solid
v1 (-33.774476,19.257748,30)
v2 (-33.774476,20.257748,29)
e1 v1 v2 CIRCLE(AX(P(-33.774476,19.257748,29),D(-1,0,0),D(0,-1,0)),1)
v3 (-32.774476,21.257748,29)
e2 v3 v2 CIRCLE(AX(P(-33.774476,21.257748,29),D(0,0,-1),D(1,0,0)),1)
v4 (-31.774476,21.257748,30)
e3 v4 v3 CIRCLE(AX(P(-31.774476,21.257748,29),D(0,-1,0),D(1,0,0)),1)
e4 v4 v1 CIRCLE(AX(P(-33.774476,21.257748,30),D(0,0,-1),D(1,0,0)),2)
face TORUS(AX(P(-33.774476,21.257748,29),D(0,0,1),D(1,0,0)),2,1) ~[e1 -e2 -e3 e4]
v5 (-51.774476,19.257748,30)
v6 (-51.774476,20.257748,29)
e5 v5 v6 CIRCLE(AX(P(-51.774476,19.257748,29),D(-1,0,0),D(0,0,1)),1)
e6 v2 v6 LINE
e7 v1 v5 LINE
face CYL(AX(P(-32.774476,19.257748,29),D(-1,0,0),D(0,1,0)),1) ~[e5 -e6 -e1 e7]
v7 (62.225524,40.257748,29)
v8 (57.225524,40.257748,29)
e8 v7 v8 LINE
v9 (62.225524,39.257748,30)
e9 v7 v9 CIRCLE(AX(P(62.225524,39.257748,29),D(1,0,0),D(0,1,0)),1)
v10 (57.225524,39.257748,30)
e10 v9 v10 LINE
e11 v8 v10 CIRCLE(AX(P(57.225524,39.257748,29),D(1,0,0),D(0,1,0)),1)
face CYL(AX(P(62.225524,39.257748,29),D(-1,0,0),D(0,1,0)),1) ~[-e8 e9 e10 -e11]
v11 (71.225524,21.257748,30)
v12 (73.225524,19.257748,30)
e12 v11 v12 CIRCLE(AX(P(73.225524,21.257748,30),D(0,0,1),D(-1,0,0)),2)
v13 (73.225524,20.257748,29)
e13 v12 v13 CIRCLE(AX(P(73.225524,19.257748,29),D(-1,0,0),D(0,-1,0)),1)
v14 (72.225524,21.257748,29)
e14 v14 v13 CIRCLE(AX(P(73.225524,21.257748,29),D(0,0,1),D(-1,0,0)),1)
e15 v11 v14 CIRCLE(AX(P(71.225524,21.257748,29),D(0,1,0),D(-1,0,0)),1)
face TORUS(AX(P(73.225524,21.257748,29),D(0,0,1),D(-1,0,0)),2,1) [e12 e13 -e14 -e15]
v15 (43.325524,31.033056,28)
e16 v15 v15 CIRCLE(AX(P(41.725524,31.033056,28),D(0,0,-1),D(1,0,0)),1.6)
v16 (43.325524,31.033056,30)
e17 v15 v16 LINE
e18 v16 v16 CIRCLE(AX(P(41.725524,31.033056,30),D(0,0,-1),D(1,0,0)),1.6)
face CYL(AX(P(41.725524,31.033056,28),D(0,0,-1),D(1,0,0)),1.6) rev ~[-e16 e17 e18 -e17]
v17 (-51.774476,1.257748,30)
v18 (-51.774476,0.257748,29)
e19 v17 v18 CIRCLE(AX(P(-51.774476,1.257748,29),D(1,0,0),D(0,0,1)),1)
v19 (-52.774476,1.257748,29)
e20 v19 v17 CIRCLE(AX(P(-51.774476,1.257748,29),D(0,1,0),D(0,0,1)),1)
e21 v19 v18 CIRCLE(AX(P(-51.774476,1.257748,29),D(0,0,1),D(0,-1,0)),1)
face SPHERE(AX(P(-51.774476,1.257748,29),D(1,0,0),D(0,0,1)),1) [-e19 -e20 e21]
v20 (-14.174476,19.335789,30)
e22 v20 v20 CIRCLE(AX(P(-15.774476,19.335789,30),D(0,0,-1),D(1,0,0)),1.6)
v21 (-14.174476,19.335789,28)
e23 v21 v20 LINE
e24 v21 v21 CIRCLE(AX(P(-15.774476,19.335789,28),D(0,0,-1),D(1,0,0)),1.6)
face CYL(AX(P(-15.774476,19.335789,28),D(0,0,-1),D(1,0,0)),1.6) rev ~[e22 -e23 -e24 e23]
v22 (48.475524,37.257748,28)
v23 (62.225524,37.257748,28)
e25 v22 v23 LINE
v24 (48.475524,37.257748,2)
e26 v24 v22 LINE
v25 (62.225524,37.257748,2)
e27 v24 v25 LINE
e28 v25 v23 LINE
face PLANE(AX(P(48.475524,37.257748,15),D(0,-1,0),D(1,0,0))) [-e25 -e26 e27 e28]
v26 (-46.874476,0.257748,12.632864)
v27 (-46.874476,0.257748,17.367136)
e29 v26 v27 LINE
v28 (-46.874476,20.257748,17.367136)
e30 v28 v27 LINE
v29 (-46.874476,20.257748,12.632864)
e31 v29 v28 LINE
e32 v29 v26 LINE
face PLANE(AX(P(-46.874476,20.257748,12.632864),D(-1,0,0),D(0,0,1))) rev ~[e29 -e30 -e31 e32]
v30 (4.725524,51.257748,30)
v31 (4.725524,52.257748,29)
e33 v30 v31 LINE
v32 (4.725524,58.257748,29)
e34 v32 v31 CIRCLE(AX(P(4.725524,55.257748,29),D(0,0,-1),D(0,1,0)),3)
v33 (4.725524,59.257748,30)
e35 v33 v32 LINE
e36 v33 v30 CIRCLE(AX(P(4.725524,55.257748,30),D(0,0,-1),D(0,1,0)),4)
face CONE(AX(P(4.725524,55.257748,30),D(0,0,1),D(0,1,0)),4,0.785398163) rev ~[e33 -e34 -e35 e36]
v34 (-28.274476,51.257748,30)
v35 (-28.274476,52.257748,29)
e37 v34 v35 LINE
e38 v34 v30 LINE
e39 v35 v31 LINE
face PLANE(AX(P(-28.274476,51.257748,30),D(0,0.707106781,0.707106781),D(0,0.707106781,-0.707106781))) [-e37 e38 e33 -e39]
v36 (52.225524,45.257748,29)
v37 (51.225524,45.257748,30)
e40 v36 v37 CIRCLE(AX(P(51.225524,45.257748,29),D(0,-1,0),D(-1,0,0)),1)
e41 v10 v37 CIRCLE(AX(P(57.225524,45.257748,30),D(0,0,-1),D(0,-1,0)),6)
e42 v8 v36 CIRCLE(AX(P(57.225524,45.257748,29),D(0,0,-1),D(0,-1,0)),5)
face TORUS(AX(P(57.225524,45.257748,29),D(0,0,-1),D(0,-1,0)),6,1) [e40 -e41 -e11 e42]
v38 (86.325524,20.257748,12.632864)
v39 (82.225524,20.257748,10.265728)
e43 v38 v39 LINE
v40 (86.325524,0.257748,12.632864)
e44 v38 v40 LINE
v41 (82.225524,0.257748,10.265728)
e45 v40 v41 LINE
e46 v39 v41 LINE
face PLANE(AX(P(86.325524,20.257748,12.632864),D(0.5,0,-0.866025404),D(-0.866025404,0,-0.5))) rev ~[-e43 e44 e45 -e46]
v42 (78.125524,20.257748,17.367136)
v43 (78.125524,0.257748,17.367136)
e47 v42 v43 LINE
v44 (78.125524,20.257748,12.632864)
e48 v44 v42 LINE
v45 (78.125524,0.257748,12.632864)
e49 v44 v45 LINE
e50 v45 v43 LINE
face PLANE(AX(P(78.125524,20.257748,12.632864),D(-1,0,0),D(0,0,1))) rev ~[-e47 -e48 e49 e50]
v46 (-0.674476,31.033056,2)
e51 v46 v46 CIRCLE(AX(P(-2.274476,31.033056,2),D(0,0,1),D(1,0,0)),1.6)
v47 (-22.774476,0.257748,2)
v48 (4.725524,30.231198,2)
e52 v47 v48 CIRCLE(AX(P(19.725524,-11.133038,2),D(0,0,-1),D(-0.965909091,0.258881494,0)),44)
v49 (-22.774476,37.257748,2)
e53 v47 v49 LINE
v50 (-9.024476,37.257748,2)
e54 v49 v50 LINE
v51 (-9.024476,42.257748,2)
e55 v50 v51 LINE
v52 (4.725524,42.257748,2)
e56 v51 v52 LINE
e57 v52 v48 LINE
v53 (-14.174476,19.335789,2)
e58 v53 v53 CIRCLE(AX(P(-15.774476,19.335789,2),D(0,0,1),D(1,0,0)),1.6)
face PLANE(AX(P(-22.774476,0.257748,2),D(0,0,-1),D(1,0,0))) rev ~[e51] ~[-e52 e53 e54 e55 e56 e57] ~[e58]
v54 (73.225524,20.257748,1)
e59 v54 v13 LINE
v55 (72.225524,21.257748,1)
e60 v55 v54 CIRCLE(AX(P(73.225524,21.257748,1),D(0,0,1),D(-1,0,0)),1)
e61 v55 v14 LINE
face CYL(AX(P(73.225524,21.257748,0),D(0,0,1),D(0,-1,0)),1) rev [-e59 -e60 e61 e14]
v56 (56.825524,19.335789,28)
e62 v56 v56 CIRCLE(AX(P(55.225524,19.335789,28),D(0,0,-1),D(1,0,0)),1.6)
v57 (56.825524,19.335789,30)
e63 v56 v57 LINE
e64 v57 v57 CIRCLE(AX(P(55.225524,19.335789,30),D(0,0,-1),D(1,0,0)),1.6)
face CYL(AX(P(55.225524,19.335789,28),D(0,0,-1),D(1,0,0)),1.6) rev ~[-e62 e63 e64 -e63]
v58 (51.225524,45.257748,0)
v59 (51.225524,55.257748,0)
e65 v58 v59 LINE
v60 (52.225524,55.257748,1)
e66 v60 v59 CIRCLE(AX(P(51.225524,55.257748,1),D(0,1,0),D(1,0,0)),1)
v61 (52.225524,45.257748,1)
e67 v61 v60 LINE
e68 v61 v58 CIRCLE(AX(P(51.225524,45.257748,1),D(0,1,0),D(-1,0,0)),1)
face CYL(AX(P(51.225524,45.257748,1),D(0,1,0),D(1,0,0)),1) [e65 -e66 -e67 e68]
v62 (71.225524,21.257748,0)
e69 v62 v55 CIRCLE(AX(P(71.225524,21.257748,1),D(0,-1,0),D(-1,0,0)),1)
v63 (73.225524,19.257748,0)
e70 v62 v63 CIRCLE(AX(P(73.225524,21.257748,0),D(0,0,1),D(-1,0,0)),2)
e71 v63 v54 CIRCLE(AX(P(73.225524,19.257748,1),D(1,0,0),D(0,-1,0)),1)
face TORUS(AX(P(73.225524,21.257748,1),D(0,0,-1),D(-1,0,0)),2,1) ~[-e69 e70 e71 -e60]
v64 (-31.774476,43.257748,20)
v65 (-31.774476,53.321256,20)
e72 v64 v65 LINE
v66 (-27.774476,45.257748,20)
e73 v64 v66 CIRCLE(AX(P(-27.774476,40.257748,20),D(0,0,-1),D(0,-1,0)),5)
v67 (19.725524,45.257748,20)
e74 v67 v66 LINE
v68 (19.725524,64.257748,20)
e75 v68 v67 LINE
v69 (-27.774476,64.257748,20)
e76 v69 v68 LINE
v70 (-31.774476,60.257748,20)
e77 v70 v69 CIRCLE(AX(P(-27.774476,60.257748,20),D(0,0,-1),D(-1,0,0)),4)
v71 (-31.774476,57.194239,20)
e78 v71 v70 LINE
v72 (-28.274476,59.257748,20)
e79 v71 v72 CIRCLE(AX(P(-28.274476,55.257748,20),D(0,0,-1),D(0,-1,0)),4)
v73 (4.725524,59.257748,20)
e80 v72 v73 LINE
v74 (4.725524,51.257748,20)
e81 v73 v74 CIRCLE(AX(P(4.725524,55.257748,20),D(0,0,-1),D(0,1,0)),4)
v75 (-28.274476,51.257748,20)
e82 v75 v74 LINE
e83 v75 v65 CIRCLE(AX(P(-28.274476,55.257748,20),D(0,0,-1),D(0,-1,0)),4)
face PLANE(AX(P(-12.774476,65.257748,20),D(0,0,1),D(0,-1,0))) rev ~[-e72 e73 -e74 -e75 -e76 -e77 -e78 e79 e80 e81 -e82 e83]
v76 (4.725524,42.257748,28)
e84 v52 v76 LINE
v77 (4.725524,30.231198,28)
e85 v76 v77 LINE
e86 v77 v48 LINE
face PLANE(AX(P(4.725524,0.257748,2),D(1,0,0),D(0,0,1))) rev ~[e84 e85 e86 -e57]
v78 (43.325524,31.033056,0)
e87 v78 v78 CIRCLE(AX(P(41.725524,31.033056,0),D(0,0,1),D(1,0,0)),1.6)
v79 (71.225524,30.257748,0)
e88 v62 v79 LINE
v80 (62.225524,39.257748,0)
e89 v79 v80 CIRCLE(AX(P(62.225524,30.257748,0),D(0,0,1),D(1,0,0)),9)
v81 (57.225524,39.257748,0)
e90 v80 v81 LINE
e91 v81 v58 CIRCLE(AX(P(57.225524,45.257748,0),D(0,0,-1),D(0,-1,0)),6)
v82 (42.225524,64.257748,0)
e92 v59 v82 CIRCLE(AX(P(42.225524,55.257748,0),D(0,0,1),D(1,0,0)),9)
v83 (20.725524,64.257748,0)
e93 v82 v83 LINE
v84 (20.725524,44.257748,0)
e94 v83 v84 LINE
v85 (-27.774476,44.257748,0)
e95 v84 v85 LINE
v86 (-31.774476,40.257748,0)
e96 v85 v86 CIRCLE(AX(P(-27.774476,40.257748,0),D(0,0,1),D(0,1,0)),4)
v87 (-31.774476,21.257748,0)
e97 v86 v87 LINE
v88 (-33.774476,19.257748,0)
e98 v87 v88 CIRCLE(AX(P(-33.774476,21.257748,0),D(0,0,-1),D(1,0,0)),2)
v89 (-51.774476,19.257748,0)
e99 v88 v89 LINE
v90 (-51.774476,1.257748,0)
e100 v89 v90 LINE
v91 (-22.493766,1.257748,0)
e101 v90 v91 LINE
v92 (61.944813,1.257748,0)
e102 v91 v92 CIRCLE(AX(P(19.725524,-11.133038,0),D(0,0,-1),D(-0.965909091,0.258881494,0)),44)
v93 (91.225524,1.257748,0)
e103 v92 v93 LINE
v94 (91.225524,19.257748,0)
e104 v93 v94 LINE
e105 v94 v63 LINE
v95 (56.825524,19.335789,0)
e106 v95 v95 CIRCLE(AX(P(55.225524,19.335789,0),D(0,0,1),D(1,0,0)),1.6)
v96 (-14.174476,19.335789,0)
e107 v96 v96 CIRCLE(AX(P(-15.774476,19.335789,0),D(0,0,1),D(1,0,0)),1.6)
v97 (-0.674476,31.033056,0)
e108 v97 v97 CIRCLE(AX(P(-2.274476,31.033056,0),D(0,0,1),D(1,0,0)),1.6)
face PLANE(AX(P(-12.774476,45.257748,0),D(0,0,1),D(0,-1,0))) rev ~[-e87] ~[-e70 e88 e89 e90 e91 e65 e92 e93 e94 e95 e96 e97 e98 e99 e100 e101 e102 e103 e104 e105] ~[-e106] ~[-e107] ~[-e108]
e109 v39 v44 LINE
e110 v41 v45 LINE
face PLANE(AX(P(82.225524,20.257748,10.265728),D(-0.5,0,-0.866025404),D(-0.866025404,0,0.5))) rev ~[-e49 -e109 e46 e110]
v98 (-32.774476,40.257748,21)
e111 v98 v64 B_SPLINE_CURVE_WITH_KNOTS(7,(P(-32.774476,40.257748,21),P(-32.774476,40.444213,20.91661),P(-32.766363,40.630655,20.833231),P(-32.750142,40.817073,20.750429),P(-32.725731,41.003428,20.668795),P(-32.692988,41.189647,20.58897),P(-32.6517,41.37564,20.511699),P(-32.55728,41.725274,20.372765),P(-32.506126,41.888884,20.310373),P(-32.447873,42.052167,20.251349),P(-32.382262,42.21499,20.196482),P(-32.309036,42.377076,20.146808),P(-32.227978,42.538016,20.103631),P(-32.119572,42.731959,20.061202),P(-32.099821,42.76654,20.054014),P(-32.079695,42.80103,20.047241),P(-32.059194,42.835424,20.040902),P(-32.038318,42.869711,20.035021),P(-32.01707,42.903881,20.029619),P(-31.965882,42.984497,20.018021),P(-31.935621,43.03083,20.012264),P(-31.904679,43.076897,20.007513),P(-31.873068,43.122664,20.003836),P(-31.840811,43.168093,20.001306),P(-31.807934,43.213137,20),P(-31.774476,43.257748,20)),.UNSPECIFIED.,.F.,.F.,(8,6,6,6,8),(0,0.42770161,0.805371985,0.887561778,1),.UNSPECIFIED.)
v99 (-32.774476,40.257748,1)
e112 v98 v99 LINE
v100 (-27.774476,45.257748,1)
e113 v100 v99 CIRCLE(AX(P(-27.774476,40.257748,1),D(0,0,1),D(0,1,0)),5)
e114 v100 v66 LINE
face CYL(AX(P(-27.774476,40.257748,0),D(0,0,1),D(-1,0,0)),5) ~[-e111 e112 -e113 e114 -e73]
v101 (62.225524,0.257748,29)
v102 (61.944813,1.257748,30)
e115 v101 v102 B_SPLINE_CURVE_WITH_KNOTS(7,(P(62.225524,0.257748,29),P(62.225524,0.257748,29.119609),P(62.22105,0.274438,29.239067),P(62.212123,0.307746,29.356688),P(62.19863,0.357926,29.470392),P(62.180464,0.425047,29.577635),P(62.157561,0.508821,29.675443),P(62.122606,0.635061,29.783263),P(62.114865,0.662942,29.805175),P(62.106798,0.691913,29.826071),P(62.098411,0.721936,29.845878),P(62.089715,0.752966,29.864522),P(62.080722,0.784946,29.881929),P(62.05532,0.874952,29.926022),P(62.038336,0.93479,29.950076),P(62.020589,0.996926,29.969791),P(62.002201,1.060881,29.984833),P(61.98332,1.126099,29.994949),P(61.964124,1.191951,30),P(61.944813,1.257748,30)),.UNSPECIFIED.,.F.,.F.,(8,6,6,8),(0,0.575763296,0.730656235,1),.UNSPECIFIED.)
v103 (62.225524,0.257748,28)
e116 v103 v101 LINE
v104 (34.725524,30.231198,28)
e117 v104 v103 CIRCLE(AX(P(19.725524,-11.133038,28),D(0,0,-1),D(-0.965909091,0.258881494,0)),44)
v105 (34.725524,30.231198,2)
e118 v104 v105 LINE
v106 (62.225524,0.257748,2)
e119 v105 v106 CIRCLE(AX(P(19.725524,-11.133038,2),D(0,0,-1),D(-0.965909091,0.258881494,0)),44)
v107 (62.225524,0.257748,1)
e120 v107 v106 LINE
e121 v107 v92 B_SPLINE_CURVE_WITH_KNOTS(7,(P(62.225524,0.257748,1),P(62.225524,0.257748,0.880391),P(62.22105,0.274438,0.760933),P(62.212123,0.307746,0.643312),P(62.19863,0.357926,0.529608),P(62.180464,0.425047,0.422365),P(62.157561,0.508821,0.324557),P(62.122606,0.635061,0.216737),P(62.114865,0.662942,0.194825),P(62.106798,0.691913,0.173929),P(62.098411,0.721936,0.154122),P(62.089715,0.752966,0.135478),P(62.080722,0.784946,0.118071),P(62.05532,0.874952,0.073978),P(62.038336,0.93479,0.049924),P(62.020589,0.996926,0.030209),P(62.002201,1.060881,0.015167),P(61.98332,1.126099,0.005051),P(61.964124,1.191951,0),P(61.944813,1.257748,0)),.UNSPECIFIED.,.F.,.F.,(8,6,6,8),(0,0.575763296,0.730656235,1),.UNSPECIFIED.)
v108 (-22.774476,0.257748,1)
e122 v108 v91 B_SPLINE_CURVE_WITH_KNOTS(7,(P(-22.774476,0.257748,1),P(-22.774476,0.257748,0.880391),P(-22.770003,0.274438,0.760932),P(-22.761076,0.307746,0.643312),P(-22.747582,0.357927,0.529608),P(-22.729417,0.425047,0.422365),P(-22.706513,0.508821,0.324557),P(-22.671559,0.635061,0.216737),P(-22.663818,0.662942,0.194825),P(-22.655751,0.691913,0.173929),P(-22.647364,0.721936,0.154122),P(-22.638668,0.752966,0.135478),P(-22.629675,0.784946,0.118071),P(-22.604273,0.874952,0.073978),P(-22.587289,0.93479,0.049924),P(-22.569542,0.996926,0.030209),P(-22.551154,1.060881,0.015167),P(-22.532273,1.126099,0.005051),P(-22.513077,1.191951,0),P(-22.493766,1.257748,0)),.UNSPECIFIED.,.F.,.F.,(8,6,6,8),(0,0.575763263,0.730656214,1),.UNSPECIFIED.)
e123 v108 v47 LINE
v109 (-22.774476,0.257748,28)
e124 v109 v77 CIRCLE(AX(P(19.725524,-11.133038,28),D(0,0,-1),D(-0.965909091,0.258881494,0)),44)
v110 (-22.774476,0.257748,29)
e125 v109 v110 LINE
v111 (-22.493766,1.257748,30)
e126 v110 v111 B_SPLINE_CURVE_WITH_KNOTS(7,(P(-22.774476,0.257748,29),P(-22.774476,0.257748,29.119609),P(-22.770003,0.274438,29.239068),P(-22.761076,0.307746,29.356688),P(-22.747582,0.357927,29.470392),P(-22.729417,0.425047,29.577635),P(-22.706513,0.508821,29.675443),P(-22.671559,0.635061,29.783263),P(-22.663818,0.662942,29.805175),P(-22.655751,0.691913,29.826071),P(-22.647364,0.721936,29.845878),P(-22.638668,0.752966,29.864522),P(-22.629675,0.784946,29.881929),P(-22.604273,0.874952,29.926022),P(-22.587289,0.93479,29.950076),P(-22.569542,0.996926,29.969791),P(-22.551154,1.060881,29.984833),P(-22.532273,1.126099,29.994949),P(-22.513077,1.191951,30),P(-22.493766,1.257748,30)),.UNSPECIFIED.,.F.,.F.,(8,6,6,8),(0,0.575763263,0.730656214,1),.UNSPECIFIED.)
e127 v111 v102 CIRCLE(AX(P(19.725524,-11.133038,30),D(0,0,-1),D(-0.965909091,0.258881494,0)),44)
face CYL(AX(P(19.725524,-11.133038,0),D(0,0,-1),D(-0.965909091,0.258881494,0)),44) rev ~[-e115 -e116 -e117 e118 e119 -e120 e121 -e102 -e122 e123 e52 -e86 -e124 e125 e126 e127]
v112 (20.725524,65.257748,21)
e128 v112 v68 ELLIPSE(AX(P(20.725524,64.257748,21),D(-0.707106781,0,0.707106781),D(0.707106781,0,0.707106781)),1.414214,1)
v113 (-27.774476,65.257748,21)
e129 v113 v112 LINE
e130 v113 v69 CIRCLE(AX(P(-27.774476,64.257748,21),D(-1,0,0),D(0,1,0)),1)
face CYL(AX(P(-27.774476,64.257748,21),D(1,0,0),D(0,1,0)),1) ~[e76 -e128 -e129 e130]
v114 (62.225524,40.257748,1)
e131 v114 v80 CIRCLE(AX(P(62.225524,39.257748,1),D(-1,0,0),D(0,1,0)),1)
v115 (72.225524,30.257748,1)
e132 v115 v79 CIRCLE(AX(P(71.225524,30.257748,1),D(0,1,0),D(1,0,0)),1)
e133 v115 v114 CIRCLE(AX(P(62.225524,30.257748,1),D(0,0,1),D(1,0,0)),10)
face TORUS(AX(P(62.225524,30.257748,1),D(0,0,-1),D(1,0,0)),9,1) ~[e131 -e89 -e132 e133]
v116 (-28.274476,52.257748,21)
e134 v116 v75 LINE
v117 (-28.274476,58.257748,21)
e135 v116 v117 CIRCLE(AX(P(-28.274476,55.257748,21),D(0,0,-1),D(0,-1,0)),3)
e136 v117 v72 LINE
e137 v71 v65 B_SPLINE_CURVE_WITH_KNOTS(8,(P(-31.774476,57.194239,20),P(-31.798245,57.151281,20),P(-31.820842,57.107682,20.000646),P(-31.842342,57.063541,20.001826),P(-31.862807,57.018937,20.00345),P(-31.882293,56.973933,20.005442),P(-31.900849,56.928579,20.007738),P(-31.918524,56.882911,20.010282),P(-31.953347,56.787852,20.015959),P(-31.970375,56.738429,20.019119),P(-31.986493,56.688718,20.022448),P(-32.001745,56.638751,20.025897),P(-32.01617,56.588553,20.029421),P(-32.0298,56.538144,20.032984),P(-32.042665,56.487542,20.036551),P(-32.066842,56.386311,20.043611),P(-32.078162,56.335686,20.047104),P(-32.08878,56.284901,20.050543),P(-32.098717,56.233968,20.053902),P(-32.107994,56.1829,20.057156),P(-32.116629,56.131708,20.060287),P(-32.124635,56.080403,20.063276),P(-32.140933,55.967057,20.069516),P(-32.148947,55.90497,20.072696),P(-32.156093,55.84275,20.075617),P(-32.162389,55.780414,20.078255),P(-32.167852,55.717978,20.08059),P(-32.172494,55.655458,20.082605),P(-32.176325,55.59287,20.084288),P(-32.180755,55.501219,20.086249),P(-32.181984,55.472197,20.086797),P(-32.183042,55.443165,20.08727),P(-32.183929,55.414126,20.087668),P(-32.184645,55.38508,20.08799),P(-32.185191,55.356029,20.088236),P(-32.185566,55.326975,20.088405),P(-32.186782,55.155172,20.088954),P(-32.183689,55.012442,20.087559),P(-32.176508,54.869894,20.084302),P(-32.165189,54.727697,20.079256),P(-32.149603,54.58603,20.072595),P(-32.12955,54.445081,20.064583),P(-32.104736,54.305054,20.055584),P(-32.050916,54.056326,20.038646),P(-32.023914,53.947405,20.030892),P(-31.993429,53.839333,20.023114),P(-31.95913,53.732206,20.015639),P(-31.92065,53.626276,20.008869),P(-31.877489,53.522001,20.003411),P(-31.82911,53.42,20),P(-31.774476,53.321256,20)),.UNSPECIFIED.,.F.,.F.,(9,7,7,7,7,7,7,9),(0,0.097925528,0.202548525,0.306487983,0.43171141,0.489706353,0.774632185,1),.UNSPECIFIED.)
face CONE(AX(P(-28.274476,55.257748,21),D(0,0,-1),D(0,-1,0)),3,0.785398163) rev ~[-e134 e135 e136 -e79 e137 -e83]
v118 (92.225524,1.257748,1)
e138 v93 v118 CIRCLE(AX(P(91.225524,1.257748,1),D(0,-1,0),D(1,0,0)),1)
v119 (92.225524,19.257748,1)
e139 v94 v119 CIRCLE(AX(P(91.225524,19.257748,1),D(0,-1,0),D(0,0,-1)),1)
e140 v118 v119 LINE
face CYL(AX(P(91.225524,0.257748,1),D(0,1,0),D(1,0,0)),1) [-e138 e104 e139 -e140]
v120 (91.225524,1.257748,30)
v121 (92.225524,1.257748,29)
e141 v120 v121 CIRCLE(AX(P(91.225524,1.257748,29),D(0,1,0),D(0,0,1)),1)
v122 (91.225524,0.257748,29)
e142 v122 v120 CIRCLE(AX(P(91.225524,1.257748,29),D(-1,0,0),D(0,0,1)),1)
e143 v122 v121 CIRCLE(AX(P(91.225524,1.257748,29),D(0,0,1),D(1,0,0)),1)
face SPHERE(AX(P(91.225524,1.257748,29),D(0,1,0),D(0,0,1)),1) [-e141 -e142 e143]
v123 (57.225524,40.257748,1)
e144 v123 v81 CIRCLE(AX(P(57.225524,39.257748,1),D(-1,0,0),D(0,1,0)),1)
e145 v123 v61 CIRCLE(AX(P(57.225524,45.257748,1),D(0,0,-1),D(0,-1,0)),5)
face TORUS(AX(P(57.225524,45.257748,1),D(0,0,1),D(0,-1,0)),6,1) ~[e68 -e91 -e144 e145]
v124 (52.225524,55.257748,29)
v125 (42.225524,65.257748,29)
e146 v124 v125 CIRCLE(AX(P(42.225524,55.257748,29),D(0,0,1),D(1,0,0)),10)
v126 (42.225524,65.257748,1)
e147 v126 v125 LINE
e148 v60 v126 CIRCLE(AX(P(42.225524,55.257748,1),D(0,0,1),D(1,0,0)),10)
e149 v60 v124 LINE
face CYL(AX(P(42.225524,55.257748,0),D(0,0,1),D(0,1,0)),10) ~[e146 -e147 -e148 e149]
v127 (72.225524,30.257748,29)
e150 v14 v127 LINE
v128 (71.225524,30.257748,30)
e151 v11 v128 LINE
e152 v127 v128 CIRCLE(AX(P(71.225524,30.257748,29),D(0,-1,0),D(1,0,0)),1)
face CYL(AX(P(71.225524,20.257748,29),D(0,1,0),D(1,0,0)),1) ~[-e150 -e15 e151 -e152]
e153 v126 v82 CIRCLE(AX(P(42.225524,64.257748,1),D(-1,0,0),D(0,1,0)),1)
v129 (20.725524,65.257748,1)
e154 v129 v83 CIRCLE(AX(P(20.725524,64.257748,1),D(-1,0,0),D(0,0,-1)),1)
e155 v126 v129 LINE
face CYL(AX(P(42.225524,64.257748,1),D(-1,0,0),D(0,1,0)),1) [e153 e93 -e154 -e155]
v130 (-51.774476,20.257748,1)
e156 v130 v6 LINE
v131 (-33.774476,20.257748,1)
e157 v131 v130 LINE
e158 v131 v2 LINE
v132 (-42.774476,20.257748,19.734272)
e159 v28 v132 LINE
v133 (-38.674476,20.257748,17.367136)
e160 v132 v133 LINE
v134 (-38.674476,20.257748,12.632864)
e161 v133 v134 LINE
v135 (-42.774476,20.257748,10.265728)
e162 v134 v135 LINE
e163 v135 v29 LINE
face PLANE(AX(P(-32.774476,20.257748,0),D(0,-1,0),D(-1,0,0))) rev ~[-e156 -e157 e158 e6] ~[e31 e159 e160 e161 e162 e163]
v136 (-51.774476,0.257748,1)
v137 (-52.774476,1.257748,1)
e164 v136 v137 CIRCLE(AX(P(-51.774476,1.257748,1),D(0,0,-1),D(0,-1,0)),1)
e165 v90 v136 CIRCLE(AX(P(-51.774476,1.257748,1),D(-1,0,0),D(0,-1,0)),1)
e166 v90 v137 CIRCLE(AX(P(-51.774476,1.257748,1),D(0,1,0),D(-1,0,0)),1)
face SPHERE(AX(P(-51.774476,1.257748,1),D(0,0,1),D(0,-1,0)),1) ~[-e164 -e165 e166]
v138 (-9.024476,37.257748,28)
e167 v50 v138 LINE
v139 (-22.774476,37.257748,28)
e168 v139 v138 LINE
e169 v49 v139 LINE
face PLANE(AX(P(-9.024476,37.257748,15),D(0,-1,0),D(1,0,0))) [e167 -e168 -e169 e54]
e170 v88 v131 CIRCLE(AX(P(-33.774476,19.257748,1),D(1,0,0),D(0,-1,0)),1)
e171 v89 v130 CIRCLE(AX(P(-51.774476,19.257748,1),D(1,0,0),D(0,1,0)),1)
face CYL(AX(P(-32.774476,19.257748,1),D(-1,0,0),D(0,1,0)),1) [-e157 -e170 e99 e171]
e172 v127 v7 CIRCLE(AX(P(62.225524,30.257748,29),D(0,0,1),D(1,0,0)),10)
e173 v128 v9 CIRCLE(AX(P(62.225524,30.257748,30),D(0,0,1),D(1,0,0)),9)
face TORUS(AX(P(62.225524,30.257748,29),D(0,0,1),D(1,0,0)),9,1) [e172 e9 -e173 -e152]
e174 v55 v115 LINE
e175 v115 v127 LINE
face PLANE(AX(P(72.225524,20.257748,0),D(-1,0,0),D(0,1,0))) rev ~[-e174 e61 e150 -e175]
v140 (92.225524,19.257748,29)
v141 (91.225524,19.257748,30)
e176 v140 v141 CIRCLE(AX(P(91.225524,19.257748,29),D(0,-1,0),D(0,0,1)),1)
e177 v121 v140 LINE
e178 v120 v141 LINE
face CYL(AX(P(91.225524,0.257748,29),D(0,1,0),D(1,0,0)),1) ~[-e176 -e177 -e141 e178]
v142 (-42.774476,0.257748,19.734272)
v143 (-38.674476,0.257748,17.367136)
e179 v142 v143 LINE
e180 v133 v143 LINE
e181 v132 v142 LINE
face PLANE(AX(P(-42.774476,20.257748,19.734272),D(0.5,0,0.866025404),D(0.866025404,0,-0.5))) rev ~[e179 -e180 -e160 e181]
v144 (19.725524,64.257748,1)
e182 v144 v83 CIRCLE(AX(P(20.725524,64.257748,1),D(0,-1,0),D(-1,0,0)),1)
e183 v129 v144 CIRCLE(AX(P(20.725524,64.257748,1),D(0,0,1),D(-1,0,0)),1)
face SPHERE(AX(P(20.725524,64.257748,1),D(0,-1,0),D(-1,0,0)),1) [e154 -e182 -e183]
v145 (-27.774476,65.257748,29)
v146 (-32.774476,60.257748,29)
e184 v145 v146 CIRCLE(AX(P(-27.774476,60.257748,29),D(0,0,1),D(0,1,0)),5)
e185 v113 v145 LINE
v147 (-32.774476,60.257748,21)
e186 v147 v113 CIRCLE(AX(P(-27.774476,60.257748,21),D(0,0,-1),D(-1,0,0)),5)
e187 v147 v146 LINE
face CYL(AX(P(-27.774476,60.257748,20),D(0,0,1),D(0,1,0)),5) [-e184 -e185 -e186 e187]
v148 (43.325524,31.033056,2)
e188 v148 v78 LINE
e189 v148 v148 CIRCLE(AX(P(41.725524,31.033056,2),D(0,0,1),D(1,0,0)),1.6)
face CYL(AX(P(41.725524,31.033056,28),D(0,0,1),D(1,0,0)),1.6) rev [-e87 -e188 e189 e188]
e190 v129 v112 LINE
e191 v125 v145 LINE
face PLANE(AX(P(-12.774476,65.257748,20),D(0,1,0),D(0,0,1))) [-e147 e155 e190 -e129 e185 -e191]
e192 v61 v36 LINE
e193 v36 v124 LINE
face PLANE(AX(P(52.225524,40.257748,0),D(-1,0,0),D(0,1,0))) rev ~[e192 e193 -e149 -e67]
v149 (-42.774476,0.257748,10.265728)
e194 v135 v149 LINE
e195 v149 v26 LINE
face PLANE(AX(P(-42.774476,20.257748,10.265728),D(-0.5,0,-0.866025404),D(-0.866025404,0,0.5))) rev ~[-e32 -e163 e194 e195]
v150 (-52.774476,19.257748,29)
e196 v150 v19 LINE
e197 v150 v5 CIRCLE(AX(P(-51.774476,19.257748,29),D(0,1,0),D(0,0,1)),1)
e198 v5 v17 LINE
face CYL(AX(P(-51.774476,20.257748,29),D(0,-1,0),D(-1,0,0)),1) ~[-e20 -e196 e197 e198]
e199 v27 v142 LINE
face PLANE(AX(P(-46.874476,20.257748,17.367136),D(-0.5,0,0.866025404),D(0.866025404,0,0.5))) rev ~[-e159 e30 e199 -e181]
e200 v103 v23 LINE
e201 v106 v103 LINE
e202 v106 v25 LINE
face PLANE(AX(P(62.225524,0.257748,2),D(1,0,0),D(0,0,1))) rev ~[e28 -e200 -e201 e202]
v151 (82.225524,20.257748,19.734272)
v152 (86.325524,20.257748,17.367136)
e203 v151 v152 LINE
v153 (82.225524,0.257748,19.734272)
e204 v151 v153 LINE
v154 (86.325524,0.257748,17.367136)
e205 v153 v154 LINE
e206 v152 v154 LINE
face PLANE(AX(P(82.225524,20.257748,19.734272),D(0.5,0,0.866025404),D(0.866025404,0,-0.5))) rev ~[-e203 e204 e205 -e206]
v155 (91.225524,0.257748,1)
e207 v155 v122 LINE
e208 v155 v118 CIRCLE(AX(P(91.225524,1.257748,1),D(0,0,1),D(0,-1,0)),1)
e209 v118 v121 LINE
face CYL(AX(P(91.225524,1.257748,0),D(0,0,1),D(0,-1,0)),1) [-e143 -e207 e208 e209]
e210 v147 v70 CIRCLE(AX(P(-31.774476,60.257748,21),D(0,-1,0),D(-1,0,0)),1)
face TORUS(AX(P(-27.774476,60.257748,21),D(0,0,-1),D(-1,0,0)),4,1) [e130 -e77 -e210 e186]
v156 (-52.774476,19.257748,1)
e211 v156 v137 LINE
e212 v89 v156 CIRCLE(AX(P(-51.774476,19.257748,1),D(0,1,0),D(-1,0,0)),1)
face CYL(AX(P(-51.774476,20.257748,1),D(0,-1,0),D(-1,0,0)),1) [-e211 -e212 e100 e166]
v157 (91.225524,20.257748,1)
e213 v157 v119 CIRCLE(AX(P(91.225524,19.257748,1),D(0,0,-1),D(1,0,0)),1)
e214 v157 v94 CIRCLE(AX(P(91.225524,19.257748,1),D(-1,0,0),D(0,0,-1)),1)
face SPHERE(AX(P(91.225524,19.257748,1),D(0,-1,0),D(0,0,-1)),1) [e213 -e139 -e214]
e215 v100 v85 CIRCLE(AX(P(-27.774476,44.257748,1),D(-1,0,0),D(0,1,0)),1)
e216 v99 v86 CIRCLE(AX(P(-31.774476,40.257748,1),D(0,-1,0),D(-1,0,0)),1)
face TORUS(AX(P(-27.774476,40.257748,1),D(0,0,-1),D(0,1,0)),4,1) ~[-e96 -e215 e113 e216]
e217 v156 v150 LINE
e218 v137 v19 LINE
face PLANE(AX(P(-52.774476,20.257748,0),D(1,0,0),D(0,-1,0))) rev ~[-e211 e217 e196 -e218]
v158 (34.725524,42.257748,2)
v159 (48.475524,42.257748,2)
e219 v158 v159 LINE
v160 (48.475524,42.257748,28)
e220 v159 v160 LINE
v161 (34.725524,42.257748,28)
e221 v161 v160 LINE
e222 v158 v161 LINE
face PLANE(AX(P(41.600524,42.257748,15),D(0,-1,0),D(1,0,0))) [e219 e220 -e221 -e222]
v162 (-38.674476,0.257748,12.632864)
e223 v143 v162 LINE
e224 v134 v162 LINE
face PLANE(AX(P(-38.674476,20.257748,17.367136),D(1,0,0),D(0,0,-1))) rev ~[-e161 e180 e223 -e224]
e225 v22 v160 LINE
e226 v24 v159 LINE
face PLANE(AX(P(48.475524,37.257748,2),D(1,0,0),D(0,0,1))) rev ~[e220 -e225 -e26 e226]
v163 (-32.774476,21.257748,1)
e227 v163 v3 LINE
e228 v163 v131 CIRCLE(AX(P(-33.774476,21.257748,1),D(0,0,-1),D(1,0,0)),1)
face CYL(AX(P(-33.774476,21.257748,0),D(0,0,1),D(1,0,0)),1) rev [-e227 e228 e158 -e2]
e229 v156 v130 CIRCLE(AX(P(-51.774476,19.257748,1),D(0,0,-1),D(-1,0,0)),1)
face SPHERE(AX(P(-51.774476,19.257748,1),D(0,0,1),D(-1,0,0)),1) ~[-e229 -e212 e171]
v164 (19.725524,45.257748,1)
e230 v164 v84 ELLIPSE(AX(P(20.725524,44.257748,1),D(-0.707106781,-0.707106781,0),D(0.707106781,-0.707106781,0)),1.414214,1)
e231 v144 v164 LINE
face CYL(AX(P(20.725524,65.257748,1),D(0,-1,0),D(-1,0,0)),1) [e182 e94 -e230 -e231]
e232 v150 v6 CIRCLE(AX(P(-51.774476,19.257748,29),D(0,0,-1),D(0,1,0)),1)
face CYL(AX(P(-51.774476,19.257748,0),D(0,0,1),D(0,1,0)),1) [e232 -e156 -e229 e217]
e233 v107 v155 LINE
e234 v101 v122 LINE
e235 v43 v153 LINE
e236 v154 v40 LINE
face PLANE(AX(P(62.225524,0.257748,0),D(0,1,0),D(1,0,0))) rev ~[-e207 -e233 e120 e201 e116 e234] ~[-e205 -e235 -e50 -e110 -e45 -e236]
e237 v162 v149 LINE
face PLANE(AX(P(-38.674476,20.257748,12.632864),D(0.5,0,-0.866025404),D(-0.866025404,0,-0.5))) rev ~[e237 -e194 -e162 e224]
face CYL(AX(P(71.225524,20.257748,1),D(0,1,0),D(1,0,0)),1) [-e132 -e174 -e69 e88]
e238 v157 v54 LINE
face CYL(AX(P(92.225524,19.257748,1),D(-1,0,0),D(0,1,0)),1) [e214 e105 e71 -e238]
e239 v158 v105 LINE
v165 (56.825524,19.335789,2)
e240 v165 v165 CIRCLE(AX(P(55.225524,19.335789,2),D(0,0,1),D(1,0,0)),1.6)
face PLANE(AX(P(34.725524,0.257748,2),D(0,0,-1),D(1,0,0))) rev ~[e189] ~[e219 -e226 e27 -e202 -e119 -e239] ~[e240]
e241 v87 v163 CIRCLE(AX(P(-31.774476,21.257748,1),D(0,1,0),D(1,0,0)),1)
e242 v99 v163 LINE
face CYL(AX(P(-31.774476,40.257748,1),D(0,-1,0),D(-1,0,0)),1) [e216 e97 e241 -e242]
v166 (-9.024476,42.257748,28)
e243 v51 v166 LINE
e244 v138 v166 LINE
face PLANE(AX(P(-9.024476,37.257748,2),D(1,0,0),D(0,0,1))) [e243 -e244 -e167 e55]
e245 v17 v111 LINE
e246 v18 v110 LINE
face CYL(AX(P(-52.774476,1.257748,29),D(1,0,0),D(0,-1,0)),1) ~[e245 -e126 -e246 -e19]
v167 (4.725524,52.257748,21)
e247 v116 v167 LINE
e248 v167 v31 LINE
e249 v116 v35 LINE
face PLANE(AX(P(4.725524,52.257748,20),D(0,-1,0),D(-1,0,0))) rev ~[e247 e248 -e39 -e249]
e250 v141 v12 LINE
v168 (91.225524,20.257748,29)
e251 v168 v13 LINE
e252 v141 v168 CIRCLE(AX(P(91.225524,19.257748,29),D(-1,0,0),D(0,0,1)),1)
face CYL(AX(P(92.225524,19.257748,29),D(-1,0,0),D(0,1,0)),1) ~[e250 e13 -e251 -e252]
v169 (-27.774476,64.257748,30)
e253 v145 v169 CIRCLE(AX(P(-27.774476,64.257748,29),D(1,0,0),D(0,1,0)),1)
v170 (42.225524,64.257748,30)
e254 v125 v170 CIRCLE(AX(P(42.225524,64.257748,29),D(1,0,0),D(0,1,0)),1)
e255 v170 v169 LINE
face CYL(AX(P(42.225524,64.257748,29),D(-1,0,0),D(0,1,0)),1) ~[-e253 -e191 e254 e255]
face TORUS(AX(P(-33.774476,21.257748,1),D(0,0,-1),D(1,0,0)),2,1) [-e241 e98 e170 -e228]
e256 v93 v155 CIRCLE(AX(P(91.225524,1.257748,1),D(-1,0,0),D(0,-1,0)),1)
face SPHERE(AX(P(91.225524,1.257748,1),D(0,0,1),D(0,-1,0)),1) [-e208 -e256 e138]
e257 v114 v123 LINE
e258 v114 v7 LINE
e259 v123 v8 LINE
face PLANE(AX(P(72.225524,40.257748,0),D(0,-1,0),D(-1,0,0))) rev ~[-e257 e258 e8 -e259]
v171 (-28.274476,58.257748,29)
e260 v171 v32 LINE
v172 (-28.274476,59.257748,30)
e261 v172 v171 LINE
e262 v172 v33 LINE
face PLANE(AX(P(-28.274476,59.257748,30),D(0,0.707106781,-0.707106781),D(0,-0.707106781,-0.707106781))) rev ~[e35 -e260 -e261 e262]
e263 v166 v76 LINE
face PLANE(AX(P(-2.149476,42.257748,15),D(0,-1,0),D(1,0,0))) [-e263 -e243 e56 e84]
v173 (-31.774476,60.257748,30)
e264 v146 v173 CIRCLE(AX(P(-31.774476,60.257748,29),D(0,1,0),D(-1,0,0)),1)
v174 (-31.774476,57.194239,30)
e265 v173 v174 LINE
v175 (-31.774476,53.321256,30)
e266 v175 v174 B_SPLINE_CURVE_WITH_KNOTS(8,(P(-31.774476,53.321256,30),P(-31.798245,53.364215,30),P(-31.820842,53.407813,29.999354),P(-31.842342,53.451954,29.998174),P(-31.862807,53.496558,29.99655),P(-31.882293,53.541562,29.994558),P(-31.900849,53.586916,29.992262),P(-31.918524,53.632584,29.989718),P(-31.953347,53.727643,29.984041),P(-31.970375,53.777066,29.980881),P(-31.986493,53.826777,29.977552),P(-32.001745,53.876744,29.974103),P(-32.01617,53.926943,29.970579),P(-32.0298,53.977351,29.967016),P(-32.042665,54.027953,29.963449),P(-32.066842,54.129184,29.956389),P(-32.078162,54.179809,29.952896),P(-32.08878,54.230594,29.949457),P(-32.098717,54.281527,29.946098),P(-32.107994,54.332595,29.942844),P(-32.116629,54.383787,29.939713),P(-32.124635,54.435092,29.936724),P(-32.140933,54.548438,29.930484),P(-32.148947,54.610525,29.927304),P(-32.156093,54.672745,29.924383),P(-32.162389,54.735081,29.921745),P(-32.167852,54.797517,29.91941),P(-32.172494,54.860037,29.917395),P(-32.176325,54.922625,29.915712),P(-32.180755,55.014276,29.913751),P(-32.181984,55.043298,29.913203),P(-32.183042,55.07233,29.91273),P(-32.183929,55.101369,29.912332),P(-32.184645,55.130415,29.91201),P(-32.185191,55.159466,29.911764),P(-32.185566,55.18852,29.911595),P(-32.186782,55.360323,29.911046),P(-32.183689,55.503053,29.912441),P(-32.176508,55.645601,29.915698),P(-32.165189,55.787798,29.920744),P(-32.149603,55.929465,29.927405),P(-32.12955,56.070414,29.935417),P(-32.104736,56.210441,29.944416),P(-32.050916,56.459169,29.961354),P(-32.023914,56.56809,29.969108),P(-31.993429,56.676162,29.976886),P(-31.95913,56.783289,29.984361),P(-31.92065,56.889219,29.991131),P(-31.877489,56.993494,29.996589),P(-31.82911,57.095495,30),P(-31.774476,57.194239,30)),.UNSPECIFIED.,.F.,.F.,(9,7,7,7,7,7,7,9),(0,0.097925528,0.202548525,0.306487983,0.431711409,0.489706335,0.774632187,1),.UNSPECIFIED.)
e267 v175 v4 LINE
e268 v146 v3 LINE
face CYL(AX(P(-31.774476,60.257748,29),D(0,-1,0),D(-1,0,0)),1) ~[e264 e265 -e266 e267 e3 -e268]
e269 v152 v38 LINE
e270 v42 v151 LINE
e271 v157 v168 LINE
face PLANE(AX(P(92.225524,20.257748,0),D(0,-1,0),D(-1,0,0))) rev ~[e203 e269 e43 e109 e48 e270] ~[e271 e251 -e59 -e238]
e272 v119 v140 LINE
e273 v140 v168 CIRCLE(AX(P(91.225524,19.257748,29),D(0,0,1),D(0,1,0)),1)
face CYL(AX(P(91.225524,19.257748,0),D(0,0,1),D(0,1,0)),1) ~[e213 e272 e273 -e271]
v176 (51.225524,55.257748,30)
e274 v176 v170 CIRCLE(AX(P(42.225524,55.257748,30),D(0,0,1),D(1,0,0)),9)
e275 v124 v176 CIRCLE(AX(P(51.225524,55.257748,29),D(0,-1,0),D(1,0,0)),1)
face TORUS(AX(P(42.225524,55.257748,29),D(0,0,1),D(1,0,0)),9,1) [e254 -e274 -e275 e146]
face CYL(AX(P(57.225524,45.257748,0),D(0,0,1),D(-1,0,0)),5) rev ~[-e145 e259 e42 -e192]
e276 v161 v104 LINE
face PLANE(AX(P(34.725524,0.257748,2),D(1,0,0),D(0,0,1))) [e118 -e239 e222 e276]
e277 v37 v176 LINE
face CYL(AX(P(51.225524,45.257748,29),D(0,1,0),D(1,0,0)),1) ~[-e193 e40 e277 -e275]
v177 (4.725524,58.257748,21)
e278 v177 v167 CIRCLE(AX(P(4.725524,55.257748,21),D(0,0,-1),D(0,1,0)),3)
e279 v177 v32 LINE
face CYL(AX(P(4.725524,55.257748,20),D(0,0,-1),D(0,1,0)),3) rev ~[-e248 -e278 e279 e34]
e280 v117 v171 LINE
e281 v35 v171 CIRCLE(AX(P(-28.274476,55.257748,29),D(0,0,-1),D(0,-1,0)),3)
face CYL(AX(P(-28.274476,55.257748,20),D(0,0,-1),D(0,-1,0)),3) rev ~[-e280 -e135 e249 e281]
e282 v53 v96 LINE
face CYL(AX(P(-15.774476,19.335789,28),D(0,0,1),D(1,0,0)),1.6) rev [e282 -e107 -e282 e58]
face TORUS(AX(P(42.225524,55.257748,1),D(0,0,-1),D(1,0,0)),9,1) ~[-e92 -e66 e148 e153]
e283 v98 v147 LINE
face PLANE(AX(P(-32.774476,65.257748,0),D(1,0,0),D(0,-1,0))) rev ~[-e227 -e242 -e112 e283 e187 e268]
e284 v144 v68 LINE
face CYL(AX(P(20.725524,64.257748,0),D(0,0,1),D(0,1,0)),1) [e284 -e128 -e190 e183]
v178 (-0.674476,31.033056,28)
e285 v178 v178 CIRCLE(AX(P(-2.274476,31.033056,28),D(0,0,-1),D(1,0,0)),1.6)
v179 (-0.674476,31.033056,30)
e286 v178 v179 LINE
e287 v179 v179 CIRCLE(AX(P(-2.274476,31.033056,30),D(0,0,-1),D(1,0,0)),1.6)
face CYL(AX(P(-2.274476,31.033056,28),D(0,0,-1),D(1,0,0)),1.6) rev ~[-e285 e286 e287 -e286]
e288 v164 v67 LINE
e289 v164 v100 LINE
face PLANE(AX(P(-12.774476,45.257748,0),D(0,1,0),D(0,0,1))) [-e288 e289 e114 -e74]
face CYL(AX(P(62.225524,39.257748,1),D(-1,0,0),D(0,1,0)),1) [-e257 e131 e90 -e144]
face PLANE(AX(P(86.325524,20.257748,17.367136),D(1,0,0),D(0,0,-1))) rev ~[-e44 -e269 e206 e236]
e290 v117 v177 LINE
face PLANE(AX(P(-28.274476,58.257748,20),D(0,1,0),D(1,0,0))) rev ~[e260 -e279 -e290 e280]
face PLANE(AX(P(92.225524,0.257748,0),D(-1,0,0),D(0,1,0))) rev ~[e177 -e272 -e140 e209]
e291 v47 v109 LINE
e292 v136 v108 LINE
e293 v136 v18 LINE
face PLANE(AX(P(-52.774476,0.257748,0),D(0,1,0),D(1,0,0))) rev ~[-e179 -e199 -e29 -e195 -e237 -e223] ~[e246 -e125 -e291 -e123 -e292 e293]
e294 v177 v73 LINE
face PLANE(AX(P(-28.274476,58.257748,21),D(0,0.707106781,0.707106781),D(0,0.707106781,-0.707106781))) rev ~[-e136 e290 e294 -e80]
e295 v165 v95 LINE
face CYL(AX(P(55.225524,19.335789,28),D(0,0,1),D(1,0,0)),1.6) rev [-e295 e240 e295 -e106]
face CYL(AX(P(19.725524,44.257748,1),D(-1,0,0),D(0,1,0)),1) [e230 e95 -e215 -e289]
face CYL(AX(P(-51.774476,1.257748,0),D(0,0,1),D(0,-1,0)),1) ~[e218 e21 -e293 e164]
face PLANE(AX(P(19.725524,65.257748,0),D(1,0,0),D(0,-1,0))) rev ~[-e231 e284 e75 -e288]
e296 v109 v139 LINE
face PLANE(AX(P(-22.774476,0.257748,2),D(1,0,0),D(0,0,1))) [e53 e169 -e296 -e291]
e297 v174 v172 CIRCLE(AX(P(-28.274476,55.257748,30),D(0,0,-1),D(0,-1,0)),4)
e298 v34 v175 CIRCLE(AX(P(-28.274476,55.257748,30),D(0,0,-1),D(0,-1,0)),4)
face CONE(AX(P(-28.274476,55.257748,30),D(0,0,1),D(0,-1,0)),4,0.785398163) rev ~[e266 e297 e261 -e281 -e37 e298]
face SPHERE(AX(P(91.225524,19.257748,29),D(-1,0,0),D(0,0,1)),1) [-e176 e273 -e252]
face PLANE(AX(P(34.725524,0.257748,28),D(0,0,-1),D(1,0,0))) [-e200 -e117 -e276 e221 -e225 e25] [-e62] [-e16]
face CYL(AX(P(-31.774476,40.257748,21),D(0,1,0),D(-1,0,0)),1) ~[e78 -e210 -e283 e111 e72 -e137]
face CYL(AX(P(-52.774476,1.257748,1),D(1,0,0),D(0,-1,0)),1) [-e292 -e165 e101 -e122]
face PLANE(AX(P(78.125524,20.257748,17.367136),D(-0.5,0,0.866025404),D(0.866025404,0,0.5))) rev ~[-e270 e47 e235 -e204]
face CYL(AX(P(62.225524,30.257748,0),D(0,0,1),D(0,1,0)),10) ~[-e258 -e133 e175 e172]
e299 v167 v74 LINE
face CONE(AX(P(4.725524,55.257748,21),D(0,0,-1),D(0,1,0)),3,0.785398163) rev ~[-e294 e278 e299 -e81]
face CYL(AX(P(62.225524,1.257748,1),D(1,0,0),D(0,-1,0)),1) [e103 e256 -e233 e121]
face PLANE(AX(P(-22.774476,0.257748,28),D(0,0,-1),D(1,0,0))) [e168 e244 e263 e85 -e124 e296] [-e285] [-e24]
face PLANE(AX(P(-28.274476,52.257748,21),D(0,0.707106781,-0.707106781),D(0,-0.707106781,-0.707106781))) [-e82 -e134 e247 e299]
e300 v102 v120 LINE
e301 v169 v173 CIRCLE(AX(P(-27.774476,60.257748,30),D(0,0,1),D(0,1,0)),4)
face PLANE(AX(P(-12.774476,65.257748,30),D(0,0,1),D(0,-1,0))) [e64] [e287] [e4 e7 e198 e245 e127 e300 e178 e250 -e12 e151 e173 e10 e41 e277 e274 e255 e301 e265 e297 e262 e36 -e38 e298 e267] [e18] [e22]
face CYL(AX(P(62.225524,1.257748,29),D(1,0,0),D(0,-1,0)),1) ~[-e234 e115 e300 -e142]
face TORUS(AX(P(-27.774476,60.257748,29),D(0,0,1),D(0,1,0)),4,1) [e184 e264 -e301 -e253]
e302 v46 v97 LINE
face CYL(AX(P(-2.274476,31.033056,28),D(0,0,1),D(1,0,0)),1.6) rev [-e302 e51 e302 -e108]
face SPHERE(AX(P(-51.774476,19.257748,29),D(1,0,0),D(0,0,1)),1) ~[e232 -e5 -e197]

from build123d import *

# Parameters (mm, degrees)
F1_DEPTH       = 30
F3_W           = 27.5
F3_H           = 26
F4_DEPTH       = 37
F7_DEPTH       = 20.001
F9_W           = 13.75
F9_H           = 26
F10_W          = 13.75
F10_H          = 26
F11_DEPTH      = 5
F8_R           = 1.6
F12_DEPTH      = 2.001
F12_DEPTH_BACK = 28.001
F13_W          = 32.5
F13_H          = 20
F14_DEPTH      = 20
F15_DEPTH      = 20
F17_DEPTH      = 10.001
F18_R          = 10
F19_R          = 5
F20_R          = 1
F21_T1_DEPTH   = 33
F21_T4_ANGLE   = 180
F21_T6_ANGLE   = 180
F21_T8_ANGLE   = 180
F21_T10_ANGLE  = 180


# Not quite as in the source:
# - a fillet or chamfer that OpenCascade refuses, or shapes differently, is made with other operations: its cross-section is extruded or revolved along the edge and cut away or added


with BuildPart() as f1:
    # F0 (on Top) → F1 (new body)
    with BuildSketch(Plane.XY):
        with BuildLine():
            Line((-52.7744764373, 20.2577475536), (-52.7744764373, 0.2577475536))
            Line((-52.7744764373, 0.2577475536), (-22.7744764373, 0.2577475536))
            ThreePointArc((-22.7744764373, 0.2577475536), (19.7255235627, 32.8669618037), (62.2255235627, 0.2577475536))
            Line((62.2255235627, 0.2577475536), (92.2255235627, 0.2577475536))
            Line((92.2255235627, 0.2577475536), (92.2255235627, 20.2577475536))
            Line((92.2255235627, 20.2577475536), (72.2255235627, 20.2577475536))
            Line((72.2255235627, 20.2577475536), (72.2255235627, 40.2577475536))
            Line((72.2255235627, 40.2577475536), (52.2255235627, 40.2577475536))
            Line((52.2255235627, 40.2577475536), (52.2255235627, 65.2577475536))
            Line((52.2255235627, 65.2577475536), (-12.7744764373, 65.2577475536))
            Line((-12.7744764373, 65.2577475536), (-12.7744764373, 40.2577475536))
            Line((-12.7744764373, 40.2577475536), (-32.7744764373, 40.2577475536))
            Line((-32.7744764373, 40.2577475536), (-32.7744764373, 20.2577475536))
            Line((-32.7744764373, 20.2577475536), (-52.7744764373, 20.2577475536))
        make_face()
    extrude(amount=F1_DEPTH)

    # F3 (on offset) → F4 (cut)
    with BuildSketch(Plane.XZ.offset(-0.2577475536)):
        with Locations((-9.0244764373, 15)):
            Rectangle(F3_W, F3_H)
        with Locations((48.4755235627, 15)):
            Rectangle(F3_W, F3_H)
    extrude(amount=-F4_DEPTH, mode=Mode.SUBTRACT)

    # F6 (on face) + F5 (on face) → F7 (cut, through all)
    with BuildSketch(Plane(origin=(0, 20.2577475536, 0), x_dir=(-1, 0, 0), z_dir=(0, 1, 0))):
        Polygon((-86.3255235627, 17.3671361037), (-86.3255235627, 12.6328638963), (-82.2255235627, 10.2657277926), (-78.1255235627, 12.6328638963), (-78.1255235627, 17.3671361037), (-82.2255235627, 19.7342722074), align=None)
    with BuildSketch(Plane(origin=(0, 20.2577475536, 0), x_dir=(-1, 0, 0), z_dir=(0, 1, 0))):
        Polygon((42.7744764373, 10.2657277926), (46.8744764373, 12.6328638963), (46.8744764373, 17.3671361037), (42.7744764373, 19.7342722074), (38.6744764373, 17.3671361037), (38.6744764373, 12.6328638963), align=None)
    extrude(amount=-F7_DEPTH, mode=Mode.SUBTRACT)

    # F9 (on face) + F10 (on face) → F11 (cut)
    with BuildSketch(Plane.XZ.offset(-37.2577475536)):
        with Locations((41.6005235627, 15)):
            Rectangle(F9_W, F9_H)
    with BuildSketch(Plane.XZ.offset(-37.2577475536)):
        with Locations((-2.1494764373, 15)):
            Rectangle(F10_W, F10_H)
    extrude(amount=-F11_DEPTH, mode=Mode.SUBTRACT)

    # F8 (on face) → F12 (cut, two sides)
    with BuildSketch(Plane(origin=(0, 0, 28), x_dir=(1, 0, 0), z_dir=(0, 0, -1))) as f12_sk:
        with Locations((55.2255235627, -19.3357891615)):
            Circle(F8_R)
        with Locations((41.7255235627, -31.033055583)):
            Circle(F8_R)
        with Locations((-15.7744764373, -19.3357891615)):
            Circle(F8_R)
        with Locations((-2.2744764373, -31.033055583)):
            Circle(F8_R)
    extrude(amount=-F12_DEPTH, mode=Mode.SUBTRACT)
    extrude(f12_sk.sketch, amount=F12_DEPTH_BACK, mode=Mode.SUBTRACT)

    # F13 (on face) → F14 (cut)
    with BuildSketch(Plane(origin=(0, 0, 0), x_dir=(1, 0, 0), z_dir=(0, 0, -1))):
        with Locations((3.4755235627, -55.2577475536)):
            Rectangle(F13_W, F13_H)
    extrude(amount=-F14_DEPTH, mode=Mode.SUBTRACT)

    # F15 (add, through all): a face of the model
    f15_faces = [f1.faces().sort_by_distance(p)[0] for p in [
        (-12.7744764373, 49.9006046965, 20.7142857143),
    ]]
    extrude(f15_faces, amount=F15_DEPTH)

    # F16 (on face) → F17 (cut, through all)
    with BuildSketch(Plane(origin=(0, 0, 20), x_dir=(1, 0, 0), z_dir=(0, 0, -1))):
        with BuildLine():
            Line((-28.2744764373, -58.2577475536), (4.7255235627, -58.2577475536))
            ThreePointArc((4.7255235627, -58.2577475536), (7.7255235627, -55.2577475536), (4.7255235627, -52.2577475536))
            Line((4.7255235627, -52.2577475536), (-28.2744764373, -52.2577475536))
            ThreePointArc((-28.2744764373, -52.2577475536), (-31.2744764373, -55.2577475536), (-28.2744764373, -58.2577475536))
        make_face()
    extrude(amount=-F17_DEPTH, mode=Mode.SUBTRACT)

    # F18
    f18_edges = [f1.edges().sort_by_distance(p)[0] for p in [
        (52.225524, 65.257748, 15),
        (72.225524, 40.257748, 15),
    ]]
    fillet(f18_edges, radius=F18_R)

    # F19
    f19_edges = [f1.edges().sort_by_distance(p)[0] for p in [
        (52.225524, 40.257748, 15),
        (-32.774476, 65.257748, 25),
        (-32.774476, 45.257748, 10),
    ]]
    fillet(f19_edges, radius=F19_R)

    # F20
    f20_edges = [f1.edges().sort_by_distance(p)[0] for p in [
        (82.225524, 20.257748, 30),
        (92.225524, 10.257748, 30),
        (77.225524, 0.257748, 30),
        (92.225524, 0.257748, 15),
        (77.225524, 0.257748, 0),
        (92.225524, 10.257748, 0),
        (82.225524, 20.257748, 0),
        (92.225524, 20.257748, 15),
        (72.225524, 20.257748, 15),
        (-42.774476, 20.257748, 30),
        (-37.774476, 0.257748, 30),
        (-52.774476, 10.257748, 30),
        (-52.774476, 20.257748, 15),
        (-52.774476, 0.257748, 15),
        (-37.774476, 0.257748, 0),
        (-52.774476, 10.257748, 0),
        (-42.774476, 20.257748, 0),
        (-32.774476, 20.257748, 15),
        (19.725524, 55.257748, 0),
        (19.725524, 65.257748, 10),
        (-4.024476, 65.257748, 20),
        (59.725524, 40.257748, 0),
        (53.68999, 41.722214, 0),
        (69.296591, 37.328815, 0),
        (52.225524, 50.257748, 0),
        (72.225524, 25.257748, 0),
        (49.296591, 62.328815, 0),
        (30.975524, 65.257748, 0),
        (-4.024476, 45.257748, 0),
        (-31.31001, 43.793281, 0),
        (-32.774476, 30.257748, 0),
        (59.725524, 40.257748, 30),
        (53.68999, 41.722214, 30),
        (69.296591, 37.328815, 30),
        (52.225524, 50.257748, 30),
        (72.225524, 25.257748, 30),
        (49.296591, 62.328815, 30),
        (7.225524, 65.257748, 30),
        (-32.774476, 42.757748, 20),
        (-32.774476, 40.257748, 30),
        (-32.774476, 52.757748, 20),
        (-31.31001, 63.793281, 30),
        (-31.31001, 63.793281, 20),
    ]]
    fillet(f20_edges, radius=F20_R)

    # F21: chamfer of 1 on 8 edges, made by hand

    # F21_s2 → F21_t1 (cut)
    with BuildSketch(Plane.YZ.offset(-28.2744764373)):
        Polygon((58.2577475536, 21), (59.2577475536, 20), (58.2577475536, 20), align=None)
        Polygon((52.2577475536, 21), (51.2577475536, 20), (52.2577475536, 20), align=None)
        Polygon((59.2577475536, 30), (58.2577475536, 29), (58.2577475536, 30), align=None)
        Polygon((51.2577475536, 30), (52.2577475536, 29), (52.2577475536, 30), align=None)
    extrude(amount=F21_T1_DEPTH, mode=Mode.SUBTRACT)

    # F21_s3 → F21_t4 (revolve, cut)
    with BuildSketch(Plane.YZ.offset(4.7255235627)):
        Polygon((58.2577475536, 21), (59.2577475536, 20), (58.2577475536, 20), align=None)
    revolve(axis=Axis((4.7255235627, 55.2577475536, 20), (0, 0, -1)), revolution_arc=F21_T4_ANGLE, mode=Mode.SUBTRACT)

    # F21_s5 → F21_t6 (revolve, cut)
    with BuildSketch(Plane.YZ.offset(-28.2744764373)):
        Polygon((52.2577475536, 21), (51.2577475536, 20), (52.2577475536, 20), align=None)
    revolve(axis=Axis((-28.2744764373, 55.2577475536, 20), (0, 0, -1)), revolution_arc=F21_T6_ANGLE, mode=Mode.SUBTRACT)

    # F21_s7 → F21_t8 (revolve, cut)
    with BuildSketch(Plane.YZ.offset(-28.2744764373)):
        Polygon((51.2577475536, 30), (52.2577475536, 29), (52.2577475536, 30), align=None)
    revolve(axis=Axis((-28.2744764373, 55.2577475536, 30), (0, 0, -1)), revolution_arc=F21_T8_ANGLE, mode=Mode.SUBTRACT)

    # F21_s9 → F21_t10 (revolve, cut)
    with BuildSketch(Plane.YZ.offset(4.7255235627)):
        Polygon((59.2577475536, 30), (58.2577475536, 29), (58.2577475536, 30), align=None)
    revolve(axis=Axis((4.7255235627, 55.2577475536, 30), (0, 0, -1)), revolution_arc=F21_T10_ANGLE, mode=Mode.SUBTRACT)


solid = f1.part
